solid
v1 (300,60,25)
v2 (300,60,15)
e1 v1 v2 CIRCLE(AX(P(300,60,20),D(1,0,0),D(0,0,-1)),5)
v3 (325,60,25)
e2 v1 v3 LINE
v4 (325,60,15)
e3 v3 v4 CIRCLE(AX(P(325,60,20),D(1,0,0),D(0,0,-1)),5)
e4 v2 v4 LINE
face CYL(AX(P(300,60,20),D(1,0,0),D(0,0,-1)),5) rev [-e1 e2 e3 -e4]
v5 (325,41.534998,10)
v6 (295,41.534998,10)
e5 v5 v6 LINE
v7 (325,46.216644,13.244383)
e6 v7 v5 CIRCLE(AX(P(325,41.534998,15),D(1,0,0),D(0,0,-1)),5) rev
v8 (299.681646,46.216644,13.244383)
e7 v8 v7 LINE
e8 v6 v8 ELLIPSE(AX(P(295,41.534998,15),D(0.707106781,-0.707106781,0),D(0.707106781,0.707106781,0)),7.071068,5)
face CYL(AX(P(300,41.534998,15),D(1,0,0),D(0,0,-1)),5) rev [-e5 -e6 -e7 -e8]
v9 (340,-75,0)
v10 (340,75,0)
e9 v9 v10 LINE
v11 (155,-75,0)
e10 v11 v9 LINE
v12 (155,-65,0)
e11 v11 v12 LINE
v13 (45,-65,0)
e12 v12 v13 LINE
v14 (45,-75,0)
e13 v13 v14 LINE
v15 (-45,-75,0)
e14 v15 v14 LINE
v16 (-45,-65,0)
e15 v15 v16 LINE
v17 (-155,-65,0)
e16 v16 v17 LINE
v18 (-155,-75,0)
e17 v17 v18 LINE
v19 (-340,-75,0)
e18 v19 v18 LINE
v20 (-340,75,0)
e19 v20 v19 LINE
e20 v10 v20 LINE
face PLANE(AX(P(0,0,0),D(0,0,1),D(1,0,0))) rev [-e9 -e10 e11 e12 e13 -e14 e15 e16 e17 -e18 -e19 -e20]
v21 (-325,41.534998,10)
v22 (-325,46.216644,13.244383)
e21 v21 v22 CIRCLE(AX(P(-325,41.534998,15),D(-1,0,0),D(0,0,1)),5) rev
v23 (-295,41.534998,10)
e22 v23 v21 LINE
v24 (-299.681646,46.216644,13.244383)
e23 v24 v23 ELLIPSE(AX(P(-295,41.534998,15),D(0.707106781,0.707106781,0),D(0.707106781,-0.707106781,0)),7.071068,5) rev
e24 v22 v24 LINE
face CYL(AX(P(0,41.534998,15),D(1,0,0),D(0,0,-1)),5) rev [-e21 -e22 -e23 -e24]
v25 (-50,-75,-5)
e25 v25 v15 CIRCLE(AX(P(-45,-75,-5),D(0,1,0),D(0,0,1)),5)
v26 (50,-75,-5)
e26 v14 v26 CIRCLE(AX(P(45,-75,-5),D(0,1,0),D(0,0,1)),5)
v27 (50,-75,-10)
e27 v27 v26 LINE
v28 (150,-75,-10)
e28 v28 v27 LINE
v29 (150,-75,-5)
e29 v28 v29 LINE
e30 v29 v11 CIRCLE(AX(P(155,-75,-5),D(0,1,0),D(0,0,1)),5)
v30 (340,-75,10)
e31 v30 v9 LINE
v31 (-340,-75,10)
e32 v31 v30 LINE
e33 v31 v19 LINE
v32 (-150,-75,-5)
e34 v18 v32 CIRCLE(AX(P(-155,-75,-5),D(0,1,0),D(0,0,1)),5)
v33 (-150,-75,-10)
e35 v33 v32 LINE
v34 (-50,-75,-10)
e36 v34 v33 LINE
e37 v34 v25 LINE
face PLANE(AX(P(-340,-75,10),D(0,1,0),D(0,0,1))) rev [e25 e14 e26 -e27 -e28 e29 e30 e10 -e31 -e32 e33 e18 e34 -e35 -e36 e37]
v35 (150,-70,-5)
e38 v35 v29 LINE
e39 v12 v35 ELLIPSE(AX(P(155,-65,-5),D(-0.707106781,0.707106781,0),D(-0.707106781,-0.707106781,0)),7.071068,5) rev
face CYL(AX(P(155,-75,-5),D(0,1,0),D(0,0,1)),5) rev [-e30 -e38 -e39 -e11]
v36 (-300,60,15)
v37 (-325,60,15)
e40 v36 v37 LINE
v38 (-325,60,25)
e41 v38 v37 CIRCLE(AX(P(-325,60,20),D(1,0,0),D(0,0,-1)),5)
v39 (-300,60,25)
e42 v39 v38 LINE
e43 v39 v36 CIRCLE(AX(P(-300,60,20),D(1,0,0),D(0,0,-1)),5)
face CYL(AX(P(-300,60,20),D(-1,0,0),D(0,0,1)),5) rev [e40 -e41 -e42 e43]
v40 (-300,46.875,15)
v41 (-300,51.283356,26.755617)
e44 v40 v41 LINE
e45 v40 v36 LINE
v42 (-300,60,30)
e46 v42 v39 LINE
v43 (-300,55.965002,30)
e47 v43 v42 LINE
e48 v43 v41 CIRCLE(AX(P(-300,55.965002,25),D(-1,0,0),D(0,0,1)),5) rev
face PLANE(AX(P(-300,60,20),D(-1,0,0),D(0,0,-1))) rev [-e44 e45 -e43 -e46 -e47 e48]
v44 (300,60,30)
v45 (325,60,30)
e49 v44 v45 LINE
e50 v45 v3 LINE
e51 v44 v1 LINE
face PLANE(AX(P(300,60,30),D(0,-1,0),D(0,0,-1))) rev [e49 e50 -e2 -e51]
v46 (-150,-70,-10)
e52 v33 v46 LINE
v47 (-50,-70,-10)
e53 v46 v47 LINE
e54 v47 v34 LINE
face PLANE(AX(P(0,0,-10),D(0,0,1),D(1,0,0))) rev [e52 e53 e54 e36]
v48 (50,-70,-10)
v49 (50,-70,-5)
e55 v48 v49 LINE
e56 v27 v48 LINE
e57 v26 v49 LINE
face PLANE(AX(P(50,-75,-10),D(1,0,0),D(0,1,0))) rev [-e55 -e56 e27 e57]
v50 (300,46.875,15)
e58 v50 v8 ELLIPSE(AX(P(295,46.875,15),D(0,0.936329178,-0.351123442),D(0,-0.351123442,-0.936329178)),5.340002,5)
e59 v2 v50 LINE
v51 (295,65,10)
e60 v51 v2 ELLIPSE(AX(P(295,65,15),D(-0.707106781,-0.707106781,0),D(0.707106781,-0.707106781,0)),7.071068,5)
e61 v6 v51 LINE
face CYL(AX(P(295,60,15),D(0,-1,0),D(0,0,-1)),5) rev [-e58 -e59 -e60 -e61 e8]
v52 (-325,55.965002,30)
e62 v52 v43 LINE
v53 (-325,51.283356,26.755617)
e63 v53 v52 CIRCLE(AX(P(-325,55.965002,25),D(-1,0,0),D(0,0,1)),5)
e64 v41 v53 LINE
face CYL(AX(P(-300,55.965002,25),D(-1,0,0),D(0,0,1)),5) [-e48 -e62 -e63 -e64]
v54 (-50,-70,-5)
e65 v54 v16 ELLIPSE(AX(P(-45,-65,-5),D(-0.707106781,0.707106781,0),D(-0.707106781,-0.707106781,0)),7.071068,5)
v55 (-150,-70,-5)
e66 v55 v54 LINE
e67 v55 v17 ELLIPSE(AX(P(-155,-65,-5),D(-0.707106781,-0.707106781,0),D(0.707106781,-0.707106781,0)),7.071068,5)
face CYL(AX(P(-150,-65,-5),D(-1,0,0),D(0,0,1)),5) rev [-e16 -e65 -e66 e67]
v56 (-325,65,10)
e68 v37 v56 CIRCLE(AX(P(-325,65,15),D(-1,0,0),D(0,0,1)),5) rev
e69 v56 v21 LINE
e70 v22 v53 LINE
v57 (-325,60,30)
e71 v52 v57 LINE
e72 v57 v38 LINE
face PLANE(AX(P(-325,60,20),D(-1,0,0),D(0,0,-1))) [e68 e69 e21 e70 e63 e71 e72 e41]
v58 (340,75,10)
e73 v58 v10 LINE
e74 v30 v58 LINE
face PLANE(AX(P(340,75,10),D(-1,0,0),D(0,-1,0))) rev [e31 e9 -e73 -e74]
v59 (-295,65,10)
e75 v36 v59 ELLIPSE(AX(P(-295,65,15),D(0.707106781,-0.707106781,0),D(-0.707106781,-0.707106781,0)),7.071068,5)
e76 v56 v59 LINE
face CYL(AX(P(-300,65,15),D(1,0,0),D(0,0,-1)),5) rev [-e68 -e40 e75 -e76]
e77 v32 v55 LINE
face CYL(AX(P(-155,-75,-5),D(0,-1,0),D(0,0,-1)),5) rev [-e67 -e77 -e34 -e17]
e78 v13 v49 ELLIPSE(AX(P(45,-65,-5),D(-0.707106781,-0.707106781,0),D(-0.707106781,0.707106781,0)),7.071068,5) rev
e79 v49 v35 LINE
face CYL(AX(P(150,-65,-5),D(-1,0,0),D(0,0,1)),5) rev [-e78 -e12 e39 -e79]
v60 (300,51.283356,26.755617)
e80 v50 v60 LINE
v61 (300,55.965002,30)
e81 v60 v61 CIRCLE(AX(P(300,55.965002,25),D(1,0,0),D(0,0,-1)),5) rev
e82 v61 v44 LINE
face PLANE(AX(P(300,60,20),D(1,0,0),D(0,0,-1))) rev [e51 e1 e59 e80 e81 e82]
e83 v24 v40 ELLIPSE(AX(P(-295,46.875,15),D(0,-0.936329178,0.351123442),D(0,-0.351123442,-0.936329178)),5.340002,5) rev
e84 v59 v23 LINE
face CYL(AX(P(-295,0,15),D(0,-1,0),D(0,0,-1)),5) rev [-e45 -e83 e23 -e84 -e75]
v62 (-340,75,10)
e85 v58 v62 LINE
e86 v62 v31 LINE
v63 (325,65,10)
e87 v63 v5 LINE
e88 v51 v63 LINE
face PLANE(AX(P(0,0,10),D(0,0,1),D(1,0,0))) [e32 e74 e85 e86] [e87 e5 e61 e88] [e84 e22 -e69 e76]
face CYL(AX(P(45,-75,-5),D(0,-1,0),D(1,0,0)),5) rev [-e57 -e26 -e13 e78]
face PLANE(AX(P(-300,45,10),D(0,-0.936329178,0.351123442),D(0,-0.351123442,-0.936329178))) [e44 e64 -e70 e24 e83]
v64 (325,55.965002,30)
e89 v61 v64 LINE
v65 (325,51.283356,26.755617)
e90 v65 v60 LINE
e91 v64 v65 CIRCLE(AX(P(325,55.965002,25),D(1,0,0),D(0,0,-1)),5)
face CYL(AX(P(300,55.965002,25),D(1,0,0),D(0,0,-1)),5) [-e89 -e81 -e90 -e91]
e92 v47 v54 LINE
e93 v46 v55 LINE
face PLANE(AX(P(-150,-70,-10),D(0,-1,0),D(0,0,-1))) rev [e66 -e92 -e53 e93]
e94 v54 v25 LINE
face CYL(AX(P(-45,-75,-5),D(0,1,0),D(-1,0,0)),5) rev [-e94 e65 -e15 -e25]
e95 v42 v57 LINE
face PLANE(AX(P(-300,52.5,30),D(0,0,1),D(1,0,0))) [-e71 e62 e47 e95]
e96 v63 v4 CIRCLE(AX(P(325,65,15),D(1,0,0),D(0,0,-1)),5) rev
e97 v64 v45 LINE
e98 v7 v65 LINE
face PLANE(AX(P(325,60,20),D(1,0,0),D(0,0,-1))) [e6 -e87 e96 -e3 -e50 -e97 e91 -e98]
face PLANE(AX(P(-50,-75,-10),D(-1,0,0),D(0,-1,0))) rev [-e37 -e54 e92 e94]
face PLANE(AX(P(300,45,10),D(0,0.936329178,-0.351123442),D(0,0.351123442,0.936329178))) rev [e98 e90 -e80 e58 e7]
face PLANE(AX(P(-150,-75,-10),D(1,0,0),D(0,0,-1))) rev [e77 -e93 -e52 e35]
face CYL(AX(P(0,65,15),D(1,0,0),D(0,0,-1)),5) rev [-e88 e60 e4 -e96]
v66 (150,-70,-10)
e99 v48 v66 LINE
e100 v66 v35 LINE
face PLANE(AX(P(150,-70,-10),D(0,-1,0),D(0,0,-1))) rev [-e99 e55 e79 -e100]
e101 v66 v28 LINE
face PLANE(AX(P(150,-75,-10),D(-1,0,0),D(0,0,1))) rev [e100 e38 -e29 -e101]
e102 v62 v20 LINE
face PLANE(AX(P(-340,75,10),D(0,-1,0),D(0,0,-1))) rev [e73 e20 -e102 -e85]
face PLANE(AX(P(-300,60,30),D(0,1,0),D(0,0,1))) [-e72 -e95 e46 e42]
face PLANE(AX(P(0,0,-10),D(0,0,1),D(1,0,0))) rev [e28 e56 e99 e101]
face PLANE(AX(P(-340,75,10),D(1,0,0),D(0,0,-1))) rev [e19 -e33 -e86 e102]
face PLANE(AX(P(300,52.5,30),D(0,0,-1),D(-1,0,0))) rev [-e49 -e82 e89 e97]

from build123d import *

# Parameters (mm, degrees)
SKETCH1_W                                     = 680
SKETCH1_H                                     = 150
VERTICAL_PORTION_DEPTH                        = 10
SHAFT_ADAPTER_RIGHT_DEPTH                     = 25
SHAFT_ADAPTER_FILLETS_R                       = 5
SKETCH5_W                                     = 100
SKETCH5_H                                     = 5
LIMIT_TAB_PREVENTS_GATE_FROM_GETTING_PU_DEPTH = 10
LIMIT_TAB_FILLETS_R                           = 5


with BuildPart() as part:
    # Sketch1 → Vertical portion (new body)
    with BuildSketch(Plane.XY):
        Rectangle(SKETCH1_W, SKETCH1_H)
    extrude(amount=VERTICAL_PORTION_DEPTH)

    # Sketch4 → Shaft adapter right (add)
    with BuildSketch(Plane(origin=(325, 0, 0), x_dir=(0, 0, -1), z_dir=(1, 0, 0))):
        with BuildLine():
            Line((-10, 45), (-30, 52.5))
            Line((-30, 52.5), (-30, 60))
            Line((-30, 60), (-25, 60))
            ThreePointArc((-25, 60), (-20, 55), (-15, 60))
            Line((-15, 60), (-10, 60))
            Line((-10, 60), (-10, 55))
            Line((-10, 55), (-10, 45))
        make_face()
    shaft_adapter_right = extrude(amount=-SHAFT_ADAPTER_RIGHT_DEPTH)

    # Shaft adapter left: Shaft adapter right across plane
    add(shaft_adapter_right.mirror(Plane(origin=(0, 0, 0), x_dir=(0, 0, 1), z_dir=(1, 0, 0))))

    # Shaft adapter fillets
    shaft_adapter_fillets_edges = [part.edges().sort_by_distance(p)[0] for p in [
        (-312.5, 52.5, 30),
        (312.5, 52.5, 30),
        (300, 52.5, 10),
        (-300, 52.5, 10),
        (-312.5, 45, 10),
        (312.5, 45, 10),
        (312.5, 60, 10),
        (-312.5, 60, 10),
    ]]
    fillet(shaft_adapter_fillets_edges, radius=SHAFT_ADAPTER_FILLETS_R - 0.0001)  # a hair under: the kernel refuses the full size

    # Sketch5 → Limit tab (prevents gate from getting pushed out of slot) (add)
    with BuildSketch(Plane(origin=(0, 0, 0), x_dir=(-1, 0, 0), z_dir=(0, 0, -1))):
        with Locations((-100, -72.5)):
            Rectangle(SKETCH5_W, SKETCH5_H)
        with Locations((100, -72.5)):
            Rectangle(SKETCH5_W, SKETCH5_H)
    extrude(amount=LIMIT_TAB_PREVENTS_GATE_FROM_GETTING_PU_DEPTH)

    # Limit tab fillets
    limit_tab_fillets_edges = [part.edges().sort_by_distance(p)[0] for p in [
        (150, -72.5, 0),
        (50, -72.5, 0),
        (100, -70, 0),
        (-150, -72.5, 0),
        (-100, -70, 0),
        (-50, -72.5, 0),
    ]]
    fillet(limit_tab_fillets_edges, radius=LIMIT_TAB_FILLETS_R)


solid = part.part
